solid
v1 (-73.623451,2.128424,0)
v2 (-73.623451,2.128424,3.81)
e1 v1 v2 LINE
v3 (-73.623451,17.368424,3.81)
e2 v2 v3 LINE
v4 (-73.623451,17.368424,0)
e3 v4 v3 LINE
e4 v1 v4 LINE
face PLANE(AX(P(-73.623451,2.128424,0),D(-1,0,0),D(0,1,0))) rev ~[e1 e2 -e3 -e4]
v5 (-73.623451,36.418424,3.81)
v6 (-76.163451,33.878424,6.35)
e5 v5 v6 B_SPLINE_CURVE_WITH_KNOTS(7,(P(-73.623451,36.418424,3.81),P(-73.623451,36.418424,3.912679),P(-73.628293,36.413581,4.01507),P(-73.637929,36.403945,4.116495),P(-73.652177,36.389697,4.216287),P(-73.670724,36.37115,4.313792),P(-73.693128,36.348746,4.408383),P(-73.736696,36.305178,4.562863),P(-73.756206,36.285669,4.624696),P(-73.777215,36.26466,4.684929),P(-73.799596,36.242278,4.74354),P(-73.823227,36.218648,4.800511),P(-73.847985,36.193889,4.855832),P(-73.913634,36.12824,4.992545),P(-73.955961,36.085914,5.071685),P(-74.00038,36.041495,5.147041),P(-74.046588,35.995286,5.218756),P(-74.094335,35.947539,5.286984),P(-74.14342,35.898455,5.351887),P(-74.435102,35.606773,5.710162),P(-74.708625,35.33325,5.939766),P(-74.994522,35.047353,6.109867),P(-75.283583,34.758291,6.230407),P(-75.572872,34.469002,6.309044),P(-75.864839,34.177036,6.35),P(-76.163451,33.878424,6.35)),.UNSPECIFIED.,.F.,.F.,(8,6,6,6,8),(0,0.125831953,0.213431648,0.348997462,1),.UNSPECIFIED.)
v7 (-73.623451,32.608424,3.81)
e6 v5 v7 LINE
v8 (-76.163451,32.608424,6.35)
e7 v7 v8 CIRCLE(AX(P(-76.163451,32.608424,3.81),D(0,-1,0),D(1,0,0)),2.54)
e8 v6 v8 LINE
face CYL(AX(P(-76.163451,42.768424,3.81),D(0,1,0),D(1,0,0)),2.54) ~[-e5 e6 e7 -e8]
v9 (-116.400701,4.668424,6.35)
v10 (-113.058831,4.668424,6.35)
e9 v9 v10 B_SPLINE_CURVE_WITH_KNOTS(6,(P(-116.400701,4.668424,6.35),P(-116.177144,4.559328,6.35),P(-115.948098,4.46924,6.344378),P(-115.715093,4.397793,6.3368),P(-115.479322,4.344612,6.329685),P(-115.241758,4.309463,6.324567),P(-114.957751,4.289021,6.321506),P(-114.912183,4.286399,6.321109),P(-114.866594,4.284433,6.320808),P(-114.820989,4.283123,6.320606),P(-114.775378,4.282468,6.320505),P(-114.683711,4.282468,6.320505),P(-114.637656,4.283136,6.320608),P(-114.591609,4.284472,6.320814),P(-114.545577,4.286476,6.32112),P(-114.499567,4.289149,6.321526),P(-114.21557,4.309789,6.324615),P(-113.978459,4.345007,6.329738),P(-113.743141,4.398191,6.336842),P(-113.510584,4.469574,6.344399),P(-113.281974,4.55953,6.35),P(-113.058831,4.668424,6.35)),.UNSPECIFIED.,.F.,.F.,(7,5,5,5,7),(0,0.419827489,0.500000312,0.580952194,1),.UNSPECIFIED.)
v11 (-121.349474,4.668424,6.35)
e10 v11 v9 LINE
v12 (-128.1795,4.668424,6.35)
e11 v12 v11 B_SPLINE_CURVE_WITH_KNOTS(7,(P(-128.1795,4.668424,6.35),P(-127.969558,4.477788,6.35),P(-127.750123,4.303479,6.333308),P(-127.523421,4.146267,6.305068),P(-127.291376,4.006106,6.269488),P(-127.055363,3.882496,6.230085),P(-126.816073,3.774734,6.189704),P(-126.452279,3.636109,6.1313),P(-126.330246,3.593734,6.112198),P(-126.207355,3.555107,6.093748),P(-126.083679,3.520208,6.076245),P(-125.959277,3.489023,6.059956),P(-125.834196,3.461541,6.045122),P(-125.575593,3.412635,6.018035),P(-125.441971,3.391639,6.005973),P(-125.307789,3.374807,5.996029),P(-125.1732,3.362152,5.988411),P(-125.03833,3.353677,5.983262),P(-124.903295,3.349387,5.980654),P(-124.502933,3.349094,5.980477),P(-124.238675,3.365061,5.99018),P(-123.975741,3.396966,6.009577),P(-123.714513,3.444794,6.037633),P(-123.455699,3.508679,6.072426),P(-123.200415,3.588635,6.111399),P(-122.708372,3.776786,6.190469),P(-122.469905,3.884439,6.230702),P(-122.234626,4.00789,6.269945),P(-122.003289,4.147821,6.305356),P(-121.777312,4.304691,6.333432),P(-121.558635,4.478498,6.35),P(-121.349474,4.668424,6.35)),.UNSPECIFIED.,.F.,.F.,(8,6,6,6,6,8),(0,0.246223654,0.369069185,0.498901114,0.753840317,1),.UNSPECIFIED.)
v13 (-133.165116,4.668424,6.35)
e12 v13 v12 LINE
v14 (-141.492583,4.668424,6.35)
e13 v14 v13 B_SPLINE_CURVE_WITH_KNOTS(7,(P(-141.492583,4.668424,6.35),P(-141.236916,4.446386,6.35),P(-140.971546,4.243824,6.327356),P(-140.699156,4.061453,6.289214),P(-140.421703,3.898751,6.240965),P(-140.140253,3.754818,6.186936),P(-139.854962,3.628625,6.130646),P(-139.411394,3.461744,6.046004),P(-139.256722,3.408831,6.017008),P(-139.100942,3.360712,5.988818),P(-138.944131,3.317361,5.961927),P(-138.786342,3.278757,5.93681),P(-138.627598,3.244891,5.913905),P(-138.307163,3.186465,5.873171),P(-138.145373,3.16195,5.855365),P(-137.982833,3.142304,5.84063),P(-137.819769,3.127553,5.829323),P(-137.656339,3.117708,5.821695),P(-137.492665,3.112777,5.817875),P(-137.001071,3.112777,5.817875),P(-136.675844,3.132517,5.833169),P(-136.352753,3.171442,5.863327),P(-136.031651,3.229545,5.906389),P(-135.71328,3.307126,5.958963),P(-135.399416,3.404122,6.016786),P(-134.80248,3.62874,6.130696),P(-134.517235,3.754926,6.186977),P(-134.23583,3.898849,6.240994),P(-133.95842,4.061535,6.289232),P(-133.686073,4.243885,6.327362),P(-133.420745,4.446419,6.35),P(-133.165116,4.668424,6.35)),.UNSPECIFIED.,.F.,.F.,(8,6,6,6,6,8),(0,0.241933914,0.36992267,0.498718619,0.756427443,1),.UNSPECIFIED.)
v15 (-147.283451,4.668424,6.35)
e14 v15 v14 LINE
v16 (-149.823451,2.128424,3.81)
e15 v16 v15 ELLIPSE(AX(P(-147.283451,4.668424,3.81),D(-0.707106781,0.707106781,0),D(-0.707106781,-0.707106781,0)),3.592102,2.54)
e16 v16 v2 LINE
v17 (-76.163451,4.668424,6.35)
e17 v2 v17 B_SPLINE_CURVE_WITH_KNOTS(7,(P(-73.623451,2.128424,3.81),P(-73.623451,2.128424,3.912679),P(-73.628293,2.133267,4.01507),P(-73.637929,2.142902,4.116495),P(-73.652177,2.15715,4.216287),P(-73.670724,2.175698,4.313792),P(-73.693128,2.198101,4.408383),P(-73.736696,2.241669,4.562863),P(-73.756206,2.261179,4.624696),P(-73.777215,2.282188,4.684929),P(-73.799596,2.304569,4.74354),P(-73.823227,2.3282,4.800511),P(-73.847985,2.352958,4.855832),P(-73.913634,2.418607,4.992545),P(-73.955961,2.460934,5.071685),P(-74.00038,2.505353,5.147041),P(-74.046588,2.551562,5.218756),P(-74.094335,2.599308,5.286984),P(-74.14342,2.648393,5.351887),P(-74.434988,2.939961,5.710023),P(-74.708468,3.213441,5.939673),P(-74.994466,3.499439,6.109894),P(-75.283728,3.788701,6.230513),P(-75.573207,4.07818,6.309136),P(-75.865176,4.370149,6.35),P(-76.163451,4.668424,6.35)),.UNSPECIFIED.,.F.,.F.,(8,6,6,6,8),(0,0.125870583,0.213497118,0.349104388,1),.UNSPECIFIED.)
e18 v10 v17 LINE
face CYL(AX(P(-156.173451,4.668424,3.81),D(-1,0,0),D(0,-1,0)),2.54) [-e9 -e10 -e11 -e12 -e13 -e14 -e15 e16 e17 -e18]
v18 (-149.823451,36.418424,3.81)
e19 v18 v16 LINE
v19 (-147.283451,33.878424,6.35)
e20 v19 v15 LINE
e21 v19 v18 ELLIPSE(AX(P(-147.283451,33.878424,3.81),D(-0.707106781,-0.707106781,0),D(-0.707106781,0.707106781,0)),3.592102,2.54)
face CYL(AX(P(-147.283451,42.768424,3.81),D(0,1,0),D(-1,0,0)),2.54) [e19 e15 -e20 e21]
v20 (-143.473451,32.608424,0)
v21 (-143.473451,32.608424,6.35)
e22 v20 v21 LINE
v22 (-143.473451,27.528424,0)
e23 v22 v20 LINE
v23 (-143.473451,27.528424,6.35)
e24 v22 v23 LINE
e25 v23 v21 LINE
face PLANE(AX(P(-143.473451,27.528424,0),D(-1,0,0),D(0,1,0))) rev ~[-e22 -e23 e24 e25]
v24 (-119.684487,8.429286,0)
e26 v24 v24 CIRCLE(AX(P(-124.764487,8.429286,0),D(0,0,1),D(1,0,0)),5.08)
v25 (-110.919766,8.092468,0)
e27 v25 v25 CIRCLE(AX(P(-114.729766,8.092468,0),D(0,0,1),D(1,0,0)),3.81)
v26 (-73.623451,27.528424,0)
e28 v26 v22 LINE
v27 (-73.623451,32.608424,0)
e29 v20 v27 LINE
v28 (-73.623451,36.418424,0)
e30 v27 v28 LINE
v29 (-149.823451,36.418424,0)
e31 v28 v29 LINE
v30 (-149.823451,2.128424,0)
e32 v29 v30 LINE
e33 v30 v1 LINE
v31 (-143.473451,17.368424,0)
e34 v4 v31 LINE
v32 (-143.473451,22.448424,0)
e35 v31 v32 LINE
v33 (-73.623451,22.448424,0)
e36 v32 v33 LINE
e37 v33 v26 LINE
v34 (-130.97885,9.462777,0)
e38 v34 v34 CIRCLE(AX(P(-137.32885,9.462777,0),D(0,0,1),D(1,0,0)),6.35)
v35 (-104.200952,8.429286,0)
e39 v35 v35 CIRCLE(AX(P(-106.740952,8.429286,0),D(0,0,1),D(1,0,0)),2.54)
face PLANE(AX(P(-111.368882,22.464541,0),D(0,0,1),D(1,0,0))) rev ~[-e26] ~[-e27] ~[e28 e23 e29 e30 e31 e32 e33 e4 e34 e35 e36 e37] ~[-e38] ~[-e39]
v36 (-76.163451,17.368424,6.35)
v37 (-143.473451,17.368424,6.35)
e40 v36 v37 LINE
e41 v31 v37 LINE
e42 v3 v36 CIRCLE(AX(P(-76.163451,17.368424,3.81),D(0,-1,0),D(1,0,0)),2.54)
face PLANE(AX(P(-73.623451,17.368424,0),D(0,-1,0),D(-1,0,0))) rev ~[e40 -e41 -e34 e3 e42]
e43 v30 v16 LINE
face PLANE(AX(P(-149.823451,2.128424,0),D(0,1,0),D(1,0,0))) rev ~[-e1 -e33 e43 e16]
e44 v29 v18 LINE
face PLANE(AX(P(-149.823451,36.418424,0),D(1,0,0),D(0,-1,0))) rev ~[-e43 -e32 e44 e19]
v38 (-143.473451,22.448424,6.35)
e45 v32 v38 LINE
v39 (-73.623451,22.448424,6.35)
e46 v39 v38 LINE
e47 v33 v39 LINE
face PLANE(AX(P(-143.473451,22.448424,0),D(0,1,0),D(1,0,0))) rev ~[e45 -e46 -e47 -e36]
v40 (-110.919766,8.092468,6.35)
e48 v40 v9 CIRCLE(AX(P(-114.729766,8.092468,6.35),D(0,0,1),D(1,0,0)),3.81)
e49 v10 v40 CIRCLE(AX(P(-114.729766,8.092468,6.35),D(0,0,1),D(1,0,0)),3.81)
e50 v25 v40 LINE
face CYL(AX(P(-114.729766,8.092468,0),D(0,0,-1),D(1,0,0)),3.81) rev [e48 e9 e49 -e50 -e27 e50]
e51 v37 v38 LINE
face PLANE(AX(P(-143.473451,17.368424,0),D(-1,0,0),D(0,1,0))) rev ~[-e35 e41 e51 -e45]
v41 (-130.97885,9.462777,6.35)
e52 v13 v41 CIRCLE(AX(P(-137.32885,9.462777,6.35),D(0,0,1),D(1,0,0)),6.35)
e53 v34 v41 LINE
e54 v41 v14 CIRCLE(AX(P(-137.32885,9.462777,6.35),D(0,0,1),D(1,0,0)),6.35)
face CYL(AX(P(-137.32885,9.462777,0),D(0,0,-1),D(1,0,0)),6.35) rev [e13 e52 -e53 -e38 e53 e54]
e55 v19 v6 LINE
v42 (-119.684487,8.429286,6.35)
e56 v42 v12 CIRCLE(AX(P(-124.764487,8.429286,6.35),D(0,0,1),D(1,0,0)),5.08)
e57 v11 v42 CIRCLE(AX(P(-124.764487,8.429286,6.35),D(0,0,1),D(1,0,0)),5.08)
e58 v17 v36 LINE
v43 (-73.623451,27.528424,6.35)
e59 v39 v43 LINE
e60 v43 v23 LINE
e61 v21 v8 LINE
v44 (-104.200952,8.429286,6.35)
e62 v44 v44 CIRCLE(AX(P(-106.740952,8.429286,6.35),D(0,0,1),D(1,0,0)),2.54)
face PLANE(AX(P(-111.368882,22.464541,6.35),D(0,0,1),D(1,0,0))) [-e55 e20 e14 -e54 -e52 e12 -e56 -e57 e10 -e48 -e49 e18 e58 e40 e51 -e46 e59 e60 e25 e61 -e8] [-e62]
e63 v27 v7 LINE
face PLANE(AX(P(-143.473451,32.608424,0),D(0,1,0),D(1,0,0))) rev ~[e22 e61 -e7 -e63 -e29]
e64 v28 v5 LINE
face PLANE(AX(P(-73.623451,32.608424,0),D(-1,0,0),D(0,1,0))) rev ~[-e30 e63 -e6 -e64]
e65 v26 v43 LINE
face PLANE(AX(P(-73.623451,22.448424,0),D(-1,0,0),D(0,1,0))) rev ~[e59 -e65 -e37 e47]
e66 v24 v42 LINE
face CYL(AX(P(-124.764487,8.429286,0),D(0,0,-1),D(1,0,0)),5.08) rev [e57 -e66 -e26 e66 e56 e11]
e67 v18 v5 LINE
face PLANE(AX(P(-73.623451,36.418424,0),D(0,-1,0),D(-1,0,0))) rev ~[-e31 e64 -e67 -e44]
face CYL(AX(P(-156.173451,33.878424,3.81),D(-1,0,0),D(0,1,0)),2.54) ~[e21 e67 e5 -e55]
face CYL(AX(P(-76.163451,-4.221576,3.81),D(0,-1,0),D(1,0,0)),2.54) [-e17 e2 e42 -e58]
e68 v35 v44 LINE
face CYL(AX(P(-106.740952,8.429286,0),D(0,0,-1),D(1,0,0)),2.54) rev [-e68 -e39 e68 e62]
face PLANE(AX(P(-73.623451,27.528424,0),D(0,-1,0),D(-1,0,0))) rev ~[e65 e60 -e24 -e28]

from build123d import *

# Parameters (mm, degrees)
F0_R         = 6.35
F0_R_2       = 5.08
F0_R_3       = 3.81
F0_R_4       = 2.54
F1_DEPTH     = 6.35
F2_T1_DEPTH  = 88.9
F2_T3_DEPTH  = 46.99
F2_T5_DEPTH  = 10.16
F2_T10_DEPTH = 27.94


# Not quite as in the source:
# - a fillet or chamfer that OpenCascade refuses, or shapes differently, is made with other operations: its cross-section is extruded or revolved along the edge and cut away or added


with BuildPart() as f1:
    # F0 (on Top) → F1 (new body)
    with BuildSketch(Plane.XY):
        Polygon((-149.8234506369, 2.128423816), (-73.6234506369, 2.128423816), (-73.6234506369, 17.368423816), (-143.4734506369, 17.368423816), (-143.4734506369, 22.448423816), (-73.6234506369, 22.448423816), (-73.6234506369, 27.528423816), (-143.4734506369, 27.528423816), (-143.4734506369, 32.608423816), (-73.6234506369, 32.608423816), (-73.6234506369, 36.418423816), (-149.8234506369, 36.418423816), align=None)
        with Locations((-137.3288496289, 9.4627772336)):
            Circle(F0_R, mode=Mode.SUBTRACT)
        with Locations((-124.7644872946, 8.4292863984)):
            Circle(F0_R_2, mode=Mode.SUBTRACT)
        with Locations((-114.7297660142, 8.0924675546)):
            Circle(F0_R_3, mode=Mode.SUBTRACT)
        with Locations((-106.7409519207, 8.4292863984)):
            Circle(F0_R_4, mode=Mode.SUBTRACT)
    extrude(amount=F1_DEPTH)

    # F2: fillet of radius 2.54 on 5 edges, made by hand

    # F2_s2 → F2_t1 (cut)
    with BuildSketch(Plane.YZ.offset(-156.1734506369)):
        with BuildLine():
            ThreePointArc((36.418423816, 3.81), (35.6744750402, 5.6060512242), (33.878423816, 6.35))
            Line((33.878423816, 6.35), (36.418423816, 6.35))
            Line((36.418423816, 6.35), (36.418423816, 3.81))
        make_face()
        with BuildLine():
            ThreePointArc((2.128423816, 3.81), (2.8723725918, 5.6060512242), (4.668423816, 6.35))
            Line((4.668423816, 6.35), (2.128423816, 6.35))
            Line((2.128423816, 6.35), (2.128423816, 3.81))
        make_face()
    extrude(amount=F2_T1_DEPTH, mode=Mode.SUBTRACT)

    # F2_s4 → F2_t3 (cut)
    with BuildSketch(Plane.XZ.offset(-42.768423816)):
        with BuildLine():
            ThreePointArc((-149.8234506369, 3.81), (-149.0795018611, 5.6060512242), (-147.2834506369, 6.35))
            Line((-147.2834506369, 6.35), (-149.8234506369, 6.35))
            Line((-149.8234506369, 6.35), (-149.8234506369, 3.81))
        make_face()
    extrude(amount=F2_T3_DEPTH, mode=Mode.SUBTRACT)

    # F2_s6 → F2_t5 (cut)
    with BuildSketch(Plane.XZ.offset(-42.768423816)):
        with BuildLine():
            ThreePointArc((-73.6234506369, 3.81), (-74.3673994126, 5.6060512242), (-76.1634506369, 6.35))
            Line((-76.1634506369, 6.35), (-73.6234506369, 6.35))
            Line((-73.6234506369, 6.35), (-73.6234506369, 3.81))
        make_face()
    extrude(amount=F2_T5_DEPTH, mode=Mode.SUBTRACT)


with BuildPart() as f2_tool8:
    # F2_s9 → F2_t10 (new body)
    with BuildSketch(Plane.XZ.offset(4.221576184)):
        with BuildLine():
            ThreePointArc((-73.6234506369, 3.81), (-74.3673994126, 5.6060512242), (-76.1634506369, 6.35))
            Line((-76.1634506369, 6.35), (-73.6234506369, 6.35))
            Line((-73.6234506369, 6.35), (-73.6234506369, 3.81))
        make_face()
    extrude(amount=-F2_T10_DEPTH)

    split(bisect_by=Plane.XZ.offset(-22.448423816), keep=Keep.TOP)


with BuildPart() as f1_1:
    add(f1.part)

    # F2_t7: cut F2_tool8
    add(f2_tool8.part, mode=Mode.SUBTRACT)


solid = f1_1.part
